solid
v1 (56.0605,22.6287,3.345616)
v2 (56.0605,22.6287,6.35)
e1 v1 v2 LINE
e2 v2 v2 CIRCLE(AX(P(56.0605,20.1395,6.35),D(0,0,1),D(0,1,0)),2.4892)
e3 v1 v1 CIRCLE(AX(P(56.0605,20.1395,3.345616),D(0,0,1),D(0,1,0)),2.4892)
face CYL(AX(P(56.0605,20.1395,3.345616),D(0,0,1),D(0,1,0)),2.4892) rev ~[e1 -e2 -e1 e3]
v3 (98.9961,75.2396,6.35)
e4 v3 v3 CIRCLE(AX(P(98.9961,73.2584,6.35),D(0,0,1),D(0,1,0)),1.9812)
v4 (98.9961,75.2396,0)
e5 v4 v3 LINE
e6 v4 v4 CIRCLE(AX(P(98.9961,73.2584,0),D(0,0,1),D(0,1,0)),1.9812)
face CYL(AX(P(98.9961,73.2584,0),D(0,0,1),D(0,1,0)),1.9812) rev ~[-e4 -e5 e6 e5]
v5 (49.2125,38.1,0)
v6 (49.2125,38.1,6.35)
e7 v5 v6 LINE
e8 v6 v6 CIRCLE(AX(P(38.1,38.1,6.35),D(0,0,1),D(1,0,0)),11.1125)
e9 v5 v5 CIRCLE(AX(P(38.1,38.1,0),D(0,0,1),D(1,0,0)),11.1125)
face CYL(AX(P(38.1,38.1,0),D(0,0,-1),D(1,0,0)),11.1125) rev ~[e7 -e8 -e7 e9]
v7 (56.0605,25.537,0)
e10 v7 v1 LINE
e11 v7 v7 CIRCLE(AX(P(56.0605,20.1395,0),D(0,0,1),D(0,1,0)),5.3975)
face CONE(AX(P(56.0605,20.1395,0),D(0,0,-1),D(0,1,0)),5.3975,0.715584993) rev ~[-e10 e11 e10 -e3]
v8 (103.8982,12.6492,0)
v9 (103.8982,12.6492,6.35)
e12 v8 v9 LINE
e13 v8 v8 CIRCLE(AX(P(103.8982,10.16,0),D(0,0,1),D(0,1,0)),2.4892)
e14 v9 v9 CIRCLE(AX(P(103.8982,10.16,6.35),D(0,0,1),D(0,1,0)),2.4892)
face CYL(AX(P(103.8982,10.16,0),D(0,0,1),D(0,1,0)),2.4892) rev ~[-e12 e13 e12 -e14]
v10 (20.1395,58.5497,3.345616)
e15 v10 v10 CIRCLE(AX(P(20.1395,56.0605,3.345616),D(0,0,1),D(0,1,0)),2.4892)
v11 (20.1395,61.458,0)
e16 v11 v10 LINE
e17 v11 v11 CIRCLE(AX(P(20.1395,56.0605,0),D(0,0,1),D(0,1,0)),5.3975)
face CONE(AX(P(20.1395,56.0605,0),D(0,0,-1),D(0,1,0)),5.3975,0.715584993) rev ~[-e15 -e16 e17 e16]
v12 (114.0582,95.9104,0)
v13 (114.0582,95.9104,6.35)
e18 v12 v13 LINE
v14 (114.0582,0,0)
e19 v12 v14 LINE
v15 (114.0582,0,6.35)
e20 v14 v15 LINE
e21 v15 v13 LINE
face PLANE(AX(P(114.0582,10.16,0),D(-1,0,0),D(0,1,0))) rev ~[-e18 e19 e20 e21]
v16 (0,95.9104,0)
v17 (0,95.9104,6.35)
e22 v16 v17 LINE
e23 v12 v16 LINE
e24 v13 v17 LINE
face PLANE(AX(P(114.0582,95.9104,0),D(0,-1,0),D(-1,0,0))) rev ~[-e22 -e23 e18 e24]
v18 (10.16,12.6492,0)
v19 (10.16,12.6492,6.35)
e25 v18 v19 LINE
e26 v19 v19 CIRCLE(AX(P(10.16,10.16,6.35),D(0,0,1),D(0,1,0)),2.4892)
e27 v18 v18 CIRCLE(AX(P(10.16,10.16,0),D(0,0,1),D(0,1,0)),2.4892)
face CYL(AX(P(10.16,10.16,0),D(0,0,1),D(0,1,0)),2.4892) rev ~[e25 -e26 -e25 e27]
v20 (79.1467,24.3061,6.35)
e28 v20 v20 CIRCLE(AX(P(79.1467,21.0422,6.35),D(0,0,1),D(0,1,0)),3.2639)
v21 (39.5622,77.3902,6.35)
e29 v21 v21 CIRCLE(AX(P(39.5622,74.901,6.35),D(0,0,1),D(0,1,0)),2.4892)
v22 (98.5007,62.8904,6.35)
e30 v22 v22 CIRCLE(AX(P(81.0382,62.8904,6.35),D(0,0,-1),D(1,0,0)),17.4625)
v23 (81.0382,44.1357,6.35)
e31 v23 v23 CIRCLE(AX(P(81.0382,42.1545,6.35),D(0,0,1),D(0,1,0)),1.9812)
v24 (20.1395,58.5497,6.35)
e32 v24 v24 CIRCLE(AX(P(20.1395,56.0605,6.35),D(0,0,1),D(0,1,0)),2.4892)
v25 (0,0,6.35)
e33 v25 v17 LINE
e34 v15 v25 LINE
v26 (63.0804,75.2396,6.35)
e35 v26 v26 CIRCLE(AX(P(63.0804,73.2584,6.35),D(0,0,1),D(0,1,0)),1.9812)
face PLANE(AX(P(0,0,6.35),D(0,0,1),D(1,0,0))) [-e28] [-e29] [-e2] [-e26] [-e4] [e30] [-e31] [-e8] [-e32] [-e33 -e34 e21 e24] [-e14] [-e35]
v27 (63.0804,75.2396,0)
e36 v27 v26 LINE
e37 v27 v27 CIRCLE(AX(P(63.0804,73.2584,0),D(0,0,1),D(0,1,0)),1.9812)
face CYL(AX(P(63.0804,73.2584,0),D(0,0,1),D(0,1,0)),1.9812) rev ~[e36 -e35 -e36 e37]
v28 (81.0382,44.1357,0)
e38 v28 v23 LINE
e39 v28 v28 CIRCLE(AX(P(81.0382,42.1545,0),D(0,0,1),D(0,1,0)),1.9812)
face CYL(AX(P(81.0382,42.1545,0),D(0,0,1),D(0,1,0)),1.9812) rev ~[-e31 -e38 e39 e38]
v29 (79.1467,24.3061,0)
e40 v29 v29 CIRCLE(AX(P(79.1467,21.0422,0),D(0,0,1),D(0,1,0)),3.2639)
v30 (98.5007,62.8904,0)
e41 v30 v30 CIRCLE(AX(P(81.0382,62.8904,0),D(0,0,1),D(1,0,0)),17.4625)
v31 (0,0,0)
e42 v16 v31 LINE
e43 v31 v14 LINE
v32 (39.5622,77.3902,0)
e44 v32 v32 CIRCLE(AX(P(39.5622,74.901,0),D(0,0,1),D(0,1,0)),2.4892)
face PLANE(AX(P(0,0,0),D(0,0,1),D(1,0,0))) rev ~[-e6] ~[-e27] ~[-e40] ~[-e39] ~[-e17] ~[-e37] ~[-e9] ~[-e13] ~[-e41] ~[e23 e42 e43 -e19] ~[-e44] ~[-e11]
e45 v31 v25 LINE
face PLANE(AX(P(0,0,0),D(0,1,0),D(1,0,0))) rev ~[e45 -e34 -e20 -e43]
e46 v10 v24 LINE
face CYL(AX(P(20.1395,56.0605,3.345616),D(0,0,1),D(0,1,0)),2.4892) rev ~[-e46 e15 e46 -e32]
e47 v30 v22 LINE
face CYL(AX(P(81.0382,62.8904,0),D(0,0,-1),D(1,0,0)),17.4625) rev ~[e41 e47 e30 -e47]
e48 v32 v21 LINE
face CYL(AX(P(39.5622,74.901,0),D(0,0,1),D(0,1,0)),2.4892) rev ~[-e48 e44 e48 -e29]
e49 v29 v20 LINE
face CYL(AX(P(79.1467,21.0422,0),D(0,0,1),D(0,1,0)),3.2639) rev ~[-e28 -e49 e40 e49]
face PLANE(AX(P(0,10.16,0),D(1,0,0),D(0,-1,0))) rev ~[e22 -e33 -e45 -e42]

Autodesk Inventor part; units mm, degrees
sketch "Sketch1" plane through (0, 0, 0) normal (0, 0, 1) x (1, 0, 0)
  line L0 (0, 0) -> (114.0582, 0)
  line L1 (114.0582, 0) -> (114.0582, 95.9104)
  line L2 (114.0582, 95.9104) -> (0, 95.9104)
  line L3 (0, 95.9104) -> (0, 0)
  line L4 (59.1, 17.1) -> (59.1, 59.1)
  line L5 (59.1, 59.1) -> (17.1, 59.1)
  line L6 (17.1, 59.1) -> (17.1, 17.1)
  line L7 (17.1, 17.1) -> (59.1, 17.1)
  line L8 (59.1, 17.1) -> (17.1, 59.1) construction
  line L9 (59.1, 59.1) -> (17.1, 17.1) construction
  circle A0 centre (38.1, 38.1) radius 38.1 construction
  circle A1 centre (38.1, 38.1) radius 20.2
  line L10 (45.4323, 38.1) -> (41.7662, 31.75)
  line L11 (41.7662, 31.75) -> (34.4338, 31.75)
  line L12 (34.4338, 31.75) -> (30.7677, 38.1)
  line L13 (30.7677, 38.1) -> (34.4338, 44.45)
  line L14 (34.4338, 44.45) -> (41.7662, 44.45)
  line L15 (41.7662, 44.45) -> (45.4323, 38.1)
  circle A2 centre (38.1, 38.1) radius 21.59 construction
  line L16 (38.1, 38.1) -> (81.0382, 62.8904) construction
  circle A3 centre (81.0382, 62.8904) radius 27.94 construction
  circle A4 centre (81.0382, 62.8904) radius 23.8125 construction
  circle A5 centre (81.0382, 62.8904) radius 17.4625
  circle A6 centre (38.1, 38.1) radius 14.2875
  line L17 (85.0105, 18.6054) -> (38.1, 38.1) construction
  circle A7 centre (81.0382, 62.8904) radius 33.02 construction
  circle A8 centre (38.1, 38.1) radius 25.4 construction
  circle A9 centre (38.1, 38.1) radius 11.1125
  line L18 (81.0382, 62.8904) -> (81.0382, 42.1545)
  circle A10 centre (81.0382, 42.1545) radius 2.0828 construction
  circle A11 centre (39.5622, 74.901) radius 10.16
  circle A12 centre (39.5622, 74.901) radius 6.35
  circle A13 centre (81.0382, 42.1545) radius 6.35 construction
  circle A14 centre (38.1, 38.1) radius 26.67 construction
  line L19 (85.0105, 18.6054) -> (87.4474, 24.4692)
  line L20 (85.0105, 18.6054) -> (82.5737, 12.7416)
  line L21 (87.4474, 24.4692) -> (77.6267, 28.5504)
  line L22 (82.5737, 12.7416) -> (72.2567, 17.029)
  circle A15 centre (103.8982, 10.16) radius 10.16
  circle A16 centre (103.8982, 10.16) radius 6.35
  circle A17 centre (10.16, 10.16) radius 10.16
  circle A18 centre (38.1, 38.1) radius 32.258 construction
  circle A19 centre (10.16, 10.16) radius 6.35
  point P0 (20.1395, 56.0605)
  point P1 (56.0605, 20.1395)
  point P2 (81.0382, 44.2373)
  point P3 (81.0382, 45.4279)
  point P4 (98.9961, 73.2584)
  point P5 (63.0804, 73.2584)
  point P6 (81.0382, 48.5045)
  point P7 (79.1467, 21.0422)
  dimension "d10" = 34.925
  dimension "d17" = 4.1656
  dimension "d25" = 12.7
  dimension "d0" = 42
  dimension "d1" = 42
  dimension "d2" = 76.2
  dimension "d3" = 40.4
  dimension "d4" = 12.7
  dimension "d5" = 43.18
  dimension "d6" = 55.88
  dimension "d7" = 49.5808
  dimension "d8" = 47.625
  dimension "d11" = 28.575
  dimension "d13" = 30
  dimension "d14" = 5.08
  dimension "d15" = 50.8
  dimension "d16" = 22.225
  dimension "d18" = 1.1906
  dimension "d21" = 360
  dimension "d23" = 20.32
  dimension "d24" = 12.7
  dimension "d26" = 3.0766
  dimension "d30" = 5.08
  dimension "d33" = 50.8
  dimension "d34" = 6.35
  dimension "d35" = 6.35
  dimension "d36" = 20.32
  dimension "d37" = 64.516
  dimension "d38" = 12.7
ref_plane "Work Plane1" through (0, 0, -6.35) normal (0, 0, 1) x (1, 0, 0)
ref_plane "Work Plane2" through (0, 0, -41.875) normal (0, 0, 1) x (1, 0, 0)
ref_plane "Work Plane3" through (0, 0, -35.525) normal (0, 0, 1) x (1, 0, 0)
ref_plane "Work Plane4" through (0, 0, -92.675) normal (0, 0, 1) x (1, 0, 0)
ref_plane "Work Plane5" through (0, 0, -99.025) normal (0, 0, 1) x (1, 0, 0)
sketch "Sketch2" plane through (0, 0, -6.35) normal (0, 0, 1) x (1, 0, 0)
  line L0 (114.0582, 95.9104) -> (0, 95.9104) projected
  line L1 (0, 95.9104) -> (0, 0) projected
  line L2 (0, 0) -> (114.0582, 0) projected
  line L3 (114.0582, 0) -> (114.0582, 95.9104) projected
  circle A0 centre (81.0382, 62.8904) radius 17.4625 projected
  circle A1 centre (38.1, 38.1) radius 11.1125 projected
sketch "Sketch3" plane through (0, 0, -41.875) normal (0, 0, 1) x (1, 0, 0)
  line L0 (114.0582, 95.9104) -> (0, 95.9104) projected
  line L1 (114.0582, 0) -> (114.0582, 95.9104) projected
  circle A0 centre (81.0382, 62.8904) radius 17.4625 projected
  line L2 (0, 0) -> (114.0582, 0) projected
  line L3 (0, 95.9104) -> (0, 0) projected
  circle A1 centre (38.1, 38.1) radius 14.2875 projected
sketch "Sketch4" plane through (0, 0, -35.525) normal (0, 0, 1) x (1, 0, 0)
  line L0 (114.0582, 95.9104) -> (0, 95.9104) projected
  line L1 (0, 95.9104) -> (0, 0) projected
  line L2 (0, 0) -> (114.0582, 0) projected
  line L3 (114.0582, 0) -> (114.0582, 95.9104) projected
  circle A0 centre (81.0382, 62.8904) radius 17.4625 projected
  circle A1 centre (38.1, 38.1) radius 14.2875 projected
sketch "Sketch5" plane through (0, 0, -92.675) normal (0, 0, 1) x (1, 0, 0)
  line L0 (0, 95.9104) -> (0, 0) projected
  line L1 (114.0582, 95.9104) -> (0, 95.9104) projected
  line L2 (0, 0) -> (114.0582, 0) projected
  line L3 (114.0582, 0) -> (114.0582, 95.9104) projected
  circle A0 centre (81.0382, 62.8904) radius 17.4625 projected
sketch "Sketch6" plane through (0, 0, -99.025) normal (0, 0, 1) x (1, 0, 0)
  line L0 (0, 95.9104) -> (0, 0) projected
  line L1 (0, 0) -> (114.0582, 0) projected
  line L2 (114.0582, 0) -> (114.0582, 95.9104) projected
  line L3 (114.0582, 95.9104) -> (0, 95.9104) projected
  circle A0 centre (81.0382, 62.8904) radius 17.4625 projected
extrude "Extrusion1" add sketch "Sketch1" along normal blind 6.35 contours L3 A17 L0 | A17 L7 L4 L5 L6 L3 L2 L1 A15 L0 | A17 L6 L7 | A15 L1 L0 | A15 | A17 L7 L6 | L6 L5 L4 L7 A17 | A1 | A6 | A11 | A12 | A16 | A19
hole "Hole1" at (39.5622, 74.901, 0) at (10.16, 10.16, 0) at (103.8982, 10.16, 0) direction (0, 0, 1) diameter 4.9784 end through all clearance for "Flat Head Machine Screw (82)" size "#10" standard "Ansi Unified Screw Threads"
hole "Hole2" at (81.0382, 42.1545, 0) at (98.9961, 73.2584, 0) at (63.0804, 73.2584, 0) direction (0, 0, 1) diameter 3.9624 end through all thread size "10-32 UNF" class "2B" standard "ANSI Unified Screw Threads"
hole "Hole3" at (79.1467, 21.0422, 0) direction (0, 0, 1) diameter 6.5278 end through all clearance for "Flat Head Machine Screw (82)" size "1/4" standard "Ansi Unified Screw Threads"
hole "Hole4" at (20.1395, 56.0605, 0) at (56.0605, 20.1395, 0) direction (0, 0, 1) diameter 4.9784 end through all countersink diameter 10.795 countersink angle 82 clearance for "Flat Head Machine Screw (82)" size "#10" standard "Ansi Unified Screw Threads"
equation "\"d30\" = d14"
properties part number "Main Outline"
